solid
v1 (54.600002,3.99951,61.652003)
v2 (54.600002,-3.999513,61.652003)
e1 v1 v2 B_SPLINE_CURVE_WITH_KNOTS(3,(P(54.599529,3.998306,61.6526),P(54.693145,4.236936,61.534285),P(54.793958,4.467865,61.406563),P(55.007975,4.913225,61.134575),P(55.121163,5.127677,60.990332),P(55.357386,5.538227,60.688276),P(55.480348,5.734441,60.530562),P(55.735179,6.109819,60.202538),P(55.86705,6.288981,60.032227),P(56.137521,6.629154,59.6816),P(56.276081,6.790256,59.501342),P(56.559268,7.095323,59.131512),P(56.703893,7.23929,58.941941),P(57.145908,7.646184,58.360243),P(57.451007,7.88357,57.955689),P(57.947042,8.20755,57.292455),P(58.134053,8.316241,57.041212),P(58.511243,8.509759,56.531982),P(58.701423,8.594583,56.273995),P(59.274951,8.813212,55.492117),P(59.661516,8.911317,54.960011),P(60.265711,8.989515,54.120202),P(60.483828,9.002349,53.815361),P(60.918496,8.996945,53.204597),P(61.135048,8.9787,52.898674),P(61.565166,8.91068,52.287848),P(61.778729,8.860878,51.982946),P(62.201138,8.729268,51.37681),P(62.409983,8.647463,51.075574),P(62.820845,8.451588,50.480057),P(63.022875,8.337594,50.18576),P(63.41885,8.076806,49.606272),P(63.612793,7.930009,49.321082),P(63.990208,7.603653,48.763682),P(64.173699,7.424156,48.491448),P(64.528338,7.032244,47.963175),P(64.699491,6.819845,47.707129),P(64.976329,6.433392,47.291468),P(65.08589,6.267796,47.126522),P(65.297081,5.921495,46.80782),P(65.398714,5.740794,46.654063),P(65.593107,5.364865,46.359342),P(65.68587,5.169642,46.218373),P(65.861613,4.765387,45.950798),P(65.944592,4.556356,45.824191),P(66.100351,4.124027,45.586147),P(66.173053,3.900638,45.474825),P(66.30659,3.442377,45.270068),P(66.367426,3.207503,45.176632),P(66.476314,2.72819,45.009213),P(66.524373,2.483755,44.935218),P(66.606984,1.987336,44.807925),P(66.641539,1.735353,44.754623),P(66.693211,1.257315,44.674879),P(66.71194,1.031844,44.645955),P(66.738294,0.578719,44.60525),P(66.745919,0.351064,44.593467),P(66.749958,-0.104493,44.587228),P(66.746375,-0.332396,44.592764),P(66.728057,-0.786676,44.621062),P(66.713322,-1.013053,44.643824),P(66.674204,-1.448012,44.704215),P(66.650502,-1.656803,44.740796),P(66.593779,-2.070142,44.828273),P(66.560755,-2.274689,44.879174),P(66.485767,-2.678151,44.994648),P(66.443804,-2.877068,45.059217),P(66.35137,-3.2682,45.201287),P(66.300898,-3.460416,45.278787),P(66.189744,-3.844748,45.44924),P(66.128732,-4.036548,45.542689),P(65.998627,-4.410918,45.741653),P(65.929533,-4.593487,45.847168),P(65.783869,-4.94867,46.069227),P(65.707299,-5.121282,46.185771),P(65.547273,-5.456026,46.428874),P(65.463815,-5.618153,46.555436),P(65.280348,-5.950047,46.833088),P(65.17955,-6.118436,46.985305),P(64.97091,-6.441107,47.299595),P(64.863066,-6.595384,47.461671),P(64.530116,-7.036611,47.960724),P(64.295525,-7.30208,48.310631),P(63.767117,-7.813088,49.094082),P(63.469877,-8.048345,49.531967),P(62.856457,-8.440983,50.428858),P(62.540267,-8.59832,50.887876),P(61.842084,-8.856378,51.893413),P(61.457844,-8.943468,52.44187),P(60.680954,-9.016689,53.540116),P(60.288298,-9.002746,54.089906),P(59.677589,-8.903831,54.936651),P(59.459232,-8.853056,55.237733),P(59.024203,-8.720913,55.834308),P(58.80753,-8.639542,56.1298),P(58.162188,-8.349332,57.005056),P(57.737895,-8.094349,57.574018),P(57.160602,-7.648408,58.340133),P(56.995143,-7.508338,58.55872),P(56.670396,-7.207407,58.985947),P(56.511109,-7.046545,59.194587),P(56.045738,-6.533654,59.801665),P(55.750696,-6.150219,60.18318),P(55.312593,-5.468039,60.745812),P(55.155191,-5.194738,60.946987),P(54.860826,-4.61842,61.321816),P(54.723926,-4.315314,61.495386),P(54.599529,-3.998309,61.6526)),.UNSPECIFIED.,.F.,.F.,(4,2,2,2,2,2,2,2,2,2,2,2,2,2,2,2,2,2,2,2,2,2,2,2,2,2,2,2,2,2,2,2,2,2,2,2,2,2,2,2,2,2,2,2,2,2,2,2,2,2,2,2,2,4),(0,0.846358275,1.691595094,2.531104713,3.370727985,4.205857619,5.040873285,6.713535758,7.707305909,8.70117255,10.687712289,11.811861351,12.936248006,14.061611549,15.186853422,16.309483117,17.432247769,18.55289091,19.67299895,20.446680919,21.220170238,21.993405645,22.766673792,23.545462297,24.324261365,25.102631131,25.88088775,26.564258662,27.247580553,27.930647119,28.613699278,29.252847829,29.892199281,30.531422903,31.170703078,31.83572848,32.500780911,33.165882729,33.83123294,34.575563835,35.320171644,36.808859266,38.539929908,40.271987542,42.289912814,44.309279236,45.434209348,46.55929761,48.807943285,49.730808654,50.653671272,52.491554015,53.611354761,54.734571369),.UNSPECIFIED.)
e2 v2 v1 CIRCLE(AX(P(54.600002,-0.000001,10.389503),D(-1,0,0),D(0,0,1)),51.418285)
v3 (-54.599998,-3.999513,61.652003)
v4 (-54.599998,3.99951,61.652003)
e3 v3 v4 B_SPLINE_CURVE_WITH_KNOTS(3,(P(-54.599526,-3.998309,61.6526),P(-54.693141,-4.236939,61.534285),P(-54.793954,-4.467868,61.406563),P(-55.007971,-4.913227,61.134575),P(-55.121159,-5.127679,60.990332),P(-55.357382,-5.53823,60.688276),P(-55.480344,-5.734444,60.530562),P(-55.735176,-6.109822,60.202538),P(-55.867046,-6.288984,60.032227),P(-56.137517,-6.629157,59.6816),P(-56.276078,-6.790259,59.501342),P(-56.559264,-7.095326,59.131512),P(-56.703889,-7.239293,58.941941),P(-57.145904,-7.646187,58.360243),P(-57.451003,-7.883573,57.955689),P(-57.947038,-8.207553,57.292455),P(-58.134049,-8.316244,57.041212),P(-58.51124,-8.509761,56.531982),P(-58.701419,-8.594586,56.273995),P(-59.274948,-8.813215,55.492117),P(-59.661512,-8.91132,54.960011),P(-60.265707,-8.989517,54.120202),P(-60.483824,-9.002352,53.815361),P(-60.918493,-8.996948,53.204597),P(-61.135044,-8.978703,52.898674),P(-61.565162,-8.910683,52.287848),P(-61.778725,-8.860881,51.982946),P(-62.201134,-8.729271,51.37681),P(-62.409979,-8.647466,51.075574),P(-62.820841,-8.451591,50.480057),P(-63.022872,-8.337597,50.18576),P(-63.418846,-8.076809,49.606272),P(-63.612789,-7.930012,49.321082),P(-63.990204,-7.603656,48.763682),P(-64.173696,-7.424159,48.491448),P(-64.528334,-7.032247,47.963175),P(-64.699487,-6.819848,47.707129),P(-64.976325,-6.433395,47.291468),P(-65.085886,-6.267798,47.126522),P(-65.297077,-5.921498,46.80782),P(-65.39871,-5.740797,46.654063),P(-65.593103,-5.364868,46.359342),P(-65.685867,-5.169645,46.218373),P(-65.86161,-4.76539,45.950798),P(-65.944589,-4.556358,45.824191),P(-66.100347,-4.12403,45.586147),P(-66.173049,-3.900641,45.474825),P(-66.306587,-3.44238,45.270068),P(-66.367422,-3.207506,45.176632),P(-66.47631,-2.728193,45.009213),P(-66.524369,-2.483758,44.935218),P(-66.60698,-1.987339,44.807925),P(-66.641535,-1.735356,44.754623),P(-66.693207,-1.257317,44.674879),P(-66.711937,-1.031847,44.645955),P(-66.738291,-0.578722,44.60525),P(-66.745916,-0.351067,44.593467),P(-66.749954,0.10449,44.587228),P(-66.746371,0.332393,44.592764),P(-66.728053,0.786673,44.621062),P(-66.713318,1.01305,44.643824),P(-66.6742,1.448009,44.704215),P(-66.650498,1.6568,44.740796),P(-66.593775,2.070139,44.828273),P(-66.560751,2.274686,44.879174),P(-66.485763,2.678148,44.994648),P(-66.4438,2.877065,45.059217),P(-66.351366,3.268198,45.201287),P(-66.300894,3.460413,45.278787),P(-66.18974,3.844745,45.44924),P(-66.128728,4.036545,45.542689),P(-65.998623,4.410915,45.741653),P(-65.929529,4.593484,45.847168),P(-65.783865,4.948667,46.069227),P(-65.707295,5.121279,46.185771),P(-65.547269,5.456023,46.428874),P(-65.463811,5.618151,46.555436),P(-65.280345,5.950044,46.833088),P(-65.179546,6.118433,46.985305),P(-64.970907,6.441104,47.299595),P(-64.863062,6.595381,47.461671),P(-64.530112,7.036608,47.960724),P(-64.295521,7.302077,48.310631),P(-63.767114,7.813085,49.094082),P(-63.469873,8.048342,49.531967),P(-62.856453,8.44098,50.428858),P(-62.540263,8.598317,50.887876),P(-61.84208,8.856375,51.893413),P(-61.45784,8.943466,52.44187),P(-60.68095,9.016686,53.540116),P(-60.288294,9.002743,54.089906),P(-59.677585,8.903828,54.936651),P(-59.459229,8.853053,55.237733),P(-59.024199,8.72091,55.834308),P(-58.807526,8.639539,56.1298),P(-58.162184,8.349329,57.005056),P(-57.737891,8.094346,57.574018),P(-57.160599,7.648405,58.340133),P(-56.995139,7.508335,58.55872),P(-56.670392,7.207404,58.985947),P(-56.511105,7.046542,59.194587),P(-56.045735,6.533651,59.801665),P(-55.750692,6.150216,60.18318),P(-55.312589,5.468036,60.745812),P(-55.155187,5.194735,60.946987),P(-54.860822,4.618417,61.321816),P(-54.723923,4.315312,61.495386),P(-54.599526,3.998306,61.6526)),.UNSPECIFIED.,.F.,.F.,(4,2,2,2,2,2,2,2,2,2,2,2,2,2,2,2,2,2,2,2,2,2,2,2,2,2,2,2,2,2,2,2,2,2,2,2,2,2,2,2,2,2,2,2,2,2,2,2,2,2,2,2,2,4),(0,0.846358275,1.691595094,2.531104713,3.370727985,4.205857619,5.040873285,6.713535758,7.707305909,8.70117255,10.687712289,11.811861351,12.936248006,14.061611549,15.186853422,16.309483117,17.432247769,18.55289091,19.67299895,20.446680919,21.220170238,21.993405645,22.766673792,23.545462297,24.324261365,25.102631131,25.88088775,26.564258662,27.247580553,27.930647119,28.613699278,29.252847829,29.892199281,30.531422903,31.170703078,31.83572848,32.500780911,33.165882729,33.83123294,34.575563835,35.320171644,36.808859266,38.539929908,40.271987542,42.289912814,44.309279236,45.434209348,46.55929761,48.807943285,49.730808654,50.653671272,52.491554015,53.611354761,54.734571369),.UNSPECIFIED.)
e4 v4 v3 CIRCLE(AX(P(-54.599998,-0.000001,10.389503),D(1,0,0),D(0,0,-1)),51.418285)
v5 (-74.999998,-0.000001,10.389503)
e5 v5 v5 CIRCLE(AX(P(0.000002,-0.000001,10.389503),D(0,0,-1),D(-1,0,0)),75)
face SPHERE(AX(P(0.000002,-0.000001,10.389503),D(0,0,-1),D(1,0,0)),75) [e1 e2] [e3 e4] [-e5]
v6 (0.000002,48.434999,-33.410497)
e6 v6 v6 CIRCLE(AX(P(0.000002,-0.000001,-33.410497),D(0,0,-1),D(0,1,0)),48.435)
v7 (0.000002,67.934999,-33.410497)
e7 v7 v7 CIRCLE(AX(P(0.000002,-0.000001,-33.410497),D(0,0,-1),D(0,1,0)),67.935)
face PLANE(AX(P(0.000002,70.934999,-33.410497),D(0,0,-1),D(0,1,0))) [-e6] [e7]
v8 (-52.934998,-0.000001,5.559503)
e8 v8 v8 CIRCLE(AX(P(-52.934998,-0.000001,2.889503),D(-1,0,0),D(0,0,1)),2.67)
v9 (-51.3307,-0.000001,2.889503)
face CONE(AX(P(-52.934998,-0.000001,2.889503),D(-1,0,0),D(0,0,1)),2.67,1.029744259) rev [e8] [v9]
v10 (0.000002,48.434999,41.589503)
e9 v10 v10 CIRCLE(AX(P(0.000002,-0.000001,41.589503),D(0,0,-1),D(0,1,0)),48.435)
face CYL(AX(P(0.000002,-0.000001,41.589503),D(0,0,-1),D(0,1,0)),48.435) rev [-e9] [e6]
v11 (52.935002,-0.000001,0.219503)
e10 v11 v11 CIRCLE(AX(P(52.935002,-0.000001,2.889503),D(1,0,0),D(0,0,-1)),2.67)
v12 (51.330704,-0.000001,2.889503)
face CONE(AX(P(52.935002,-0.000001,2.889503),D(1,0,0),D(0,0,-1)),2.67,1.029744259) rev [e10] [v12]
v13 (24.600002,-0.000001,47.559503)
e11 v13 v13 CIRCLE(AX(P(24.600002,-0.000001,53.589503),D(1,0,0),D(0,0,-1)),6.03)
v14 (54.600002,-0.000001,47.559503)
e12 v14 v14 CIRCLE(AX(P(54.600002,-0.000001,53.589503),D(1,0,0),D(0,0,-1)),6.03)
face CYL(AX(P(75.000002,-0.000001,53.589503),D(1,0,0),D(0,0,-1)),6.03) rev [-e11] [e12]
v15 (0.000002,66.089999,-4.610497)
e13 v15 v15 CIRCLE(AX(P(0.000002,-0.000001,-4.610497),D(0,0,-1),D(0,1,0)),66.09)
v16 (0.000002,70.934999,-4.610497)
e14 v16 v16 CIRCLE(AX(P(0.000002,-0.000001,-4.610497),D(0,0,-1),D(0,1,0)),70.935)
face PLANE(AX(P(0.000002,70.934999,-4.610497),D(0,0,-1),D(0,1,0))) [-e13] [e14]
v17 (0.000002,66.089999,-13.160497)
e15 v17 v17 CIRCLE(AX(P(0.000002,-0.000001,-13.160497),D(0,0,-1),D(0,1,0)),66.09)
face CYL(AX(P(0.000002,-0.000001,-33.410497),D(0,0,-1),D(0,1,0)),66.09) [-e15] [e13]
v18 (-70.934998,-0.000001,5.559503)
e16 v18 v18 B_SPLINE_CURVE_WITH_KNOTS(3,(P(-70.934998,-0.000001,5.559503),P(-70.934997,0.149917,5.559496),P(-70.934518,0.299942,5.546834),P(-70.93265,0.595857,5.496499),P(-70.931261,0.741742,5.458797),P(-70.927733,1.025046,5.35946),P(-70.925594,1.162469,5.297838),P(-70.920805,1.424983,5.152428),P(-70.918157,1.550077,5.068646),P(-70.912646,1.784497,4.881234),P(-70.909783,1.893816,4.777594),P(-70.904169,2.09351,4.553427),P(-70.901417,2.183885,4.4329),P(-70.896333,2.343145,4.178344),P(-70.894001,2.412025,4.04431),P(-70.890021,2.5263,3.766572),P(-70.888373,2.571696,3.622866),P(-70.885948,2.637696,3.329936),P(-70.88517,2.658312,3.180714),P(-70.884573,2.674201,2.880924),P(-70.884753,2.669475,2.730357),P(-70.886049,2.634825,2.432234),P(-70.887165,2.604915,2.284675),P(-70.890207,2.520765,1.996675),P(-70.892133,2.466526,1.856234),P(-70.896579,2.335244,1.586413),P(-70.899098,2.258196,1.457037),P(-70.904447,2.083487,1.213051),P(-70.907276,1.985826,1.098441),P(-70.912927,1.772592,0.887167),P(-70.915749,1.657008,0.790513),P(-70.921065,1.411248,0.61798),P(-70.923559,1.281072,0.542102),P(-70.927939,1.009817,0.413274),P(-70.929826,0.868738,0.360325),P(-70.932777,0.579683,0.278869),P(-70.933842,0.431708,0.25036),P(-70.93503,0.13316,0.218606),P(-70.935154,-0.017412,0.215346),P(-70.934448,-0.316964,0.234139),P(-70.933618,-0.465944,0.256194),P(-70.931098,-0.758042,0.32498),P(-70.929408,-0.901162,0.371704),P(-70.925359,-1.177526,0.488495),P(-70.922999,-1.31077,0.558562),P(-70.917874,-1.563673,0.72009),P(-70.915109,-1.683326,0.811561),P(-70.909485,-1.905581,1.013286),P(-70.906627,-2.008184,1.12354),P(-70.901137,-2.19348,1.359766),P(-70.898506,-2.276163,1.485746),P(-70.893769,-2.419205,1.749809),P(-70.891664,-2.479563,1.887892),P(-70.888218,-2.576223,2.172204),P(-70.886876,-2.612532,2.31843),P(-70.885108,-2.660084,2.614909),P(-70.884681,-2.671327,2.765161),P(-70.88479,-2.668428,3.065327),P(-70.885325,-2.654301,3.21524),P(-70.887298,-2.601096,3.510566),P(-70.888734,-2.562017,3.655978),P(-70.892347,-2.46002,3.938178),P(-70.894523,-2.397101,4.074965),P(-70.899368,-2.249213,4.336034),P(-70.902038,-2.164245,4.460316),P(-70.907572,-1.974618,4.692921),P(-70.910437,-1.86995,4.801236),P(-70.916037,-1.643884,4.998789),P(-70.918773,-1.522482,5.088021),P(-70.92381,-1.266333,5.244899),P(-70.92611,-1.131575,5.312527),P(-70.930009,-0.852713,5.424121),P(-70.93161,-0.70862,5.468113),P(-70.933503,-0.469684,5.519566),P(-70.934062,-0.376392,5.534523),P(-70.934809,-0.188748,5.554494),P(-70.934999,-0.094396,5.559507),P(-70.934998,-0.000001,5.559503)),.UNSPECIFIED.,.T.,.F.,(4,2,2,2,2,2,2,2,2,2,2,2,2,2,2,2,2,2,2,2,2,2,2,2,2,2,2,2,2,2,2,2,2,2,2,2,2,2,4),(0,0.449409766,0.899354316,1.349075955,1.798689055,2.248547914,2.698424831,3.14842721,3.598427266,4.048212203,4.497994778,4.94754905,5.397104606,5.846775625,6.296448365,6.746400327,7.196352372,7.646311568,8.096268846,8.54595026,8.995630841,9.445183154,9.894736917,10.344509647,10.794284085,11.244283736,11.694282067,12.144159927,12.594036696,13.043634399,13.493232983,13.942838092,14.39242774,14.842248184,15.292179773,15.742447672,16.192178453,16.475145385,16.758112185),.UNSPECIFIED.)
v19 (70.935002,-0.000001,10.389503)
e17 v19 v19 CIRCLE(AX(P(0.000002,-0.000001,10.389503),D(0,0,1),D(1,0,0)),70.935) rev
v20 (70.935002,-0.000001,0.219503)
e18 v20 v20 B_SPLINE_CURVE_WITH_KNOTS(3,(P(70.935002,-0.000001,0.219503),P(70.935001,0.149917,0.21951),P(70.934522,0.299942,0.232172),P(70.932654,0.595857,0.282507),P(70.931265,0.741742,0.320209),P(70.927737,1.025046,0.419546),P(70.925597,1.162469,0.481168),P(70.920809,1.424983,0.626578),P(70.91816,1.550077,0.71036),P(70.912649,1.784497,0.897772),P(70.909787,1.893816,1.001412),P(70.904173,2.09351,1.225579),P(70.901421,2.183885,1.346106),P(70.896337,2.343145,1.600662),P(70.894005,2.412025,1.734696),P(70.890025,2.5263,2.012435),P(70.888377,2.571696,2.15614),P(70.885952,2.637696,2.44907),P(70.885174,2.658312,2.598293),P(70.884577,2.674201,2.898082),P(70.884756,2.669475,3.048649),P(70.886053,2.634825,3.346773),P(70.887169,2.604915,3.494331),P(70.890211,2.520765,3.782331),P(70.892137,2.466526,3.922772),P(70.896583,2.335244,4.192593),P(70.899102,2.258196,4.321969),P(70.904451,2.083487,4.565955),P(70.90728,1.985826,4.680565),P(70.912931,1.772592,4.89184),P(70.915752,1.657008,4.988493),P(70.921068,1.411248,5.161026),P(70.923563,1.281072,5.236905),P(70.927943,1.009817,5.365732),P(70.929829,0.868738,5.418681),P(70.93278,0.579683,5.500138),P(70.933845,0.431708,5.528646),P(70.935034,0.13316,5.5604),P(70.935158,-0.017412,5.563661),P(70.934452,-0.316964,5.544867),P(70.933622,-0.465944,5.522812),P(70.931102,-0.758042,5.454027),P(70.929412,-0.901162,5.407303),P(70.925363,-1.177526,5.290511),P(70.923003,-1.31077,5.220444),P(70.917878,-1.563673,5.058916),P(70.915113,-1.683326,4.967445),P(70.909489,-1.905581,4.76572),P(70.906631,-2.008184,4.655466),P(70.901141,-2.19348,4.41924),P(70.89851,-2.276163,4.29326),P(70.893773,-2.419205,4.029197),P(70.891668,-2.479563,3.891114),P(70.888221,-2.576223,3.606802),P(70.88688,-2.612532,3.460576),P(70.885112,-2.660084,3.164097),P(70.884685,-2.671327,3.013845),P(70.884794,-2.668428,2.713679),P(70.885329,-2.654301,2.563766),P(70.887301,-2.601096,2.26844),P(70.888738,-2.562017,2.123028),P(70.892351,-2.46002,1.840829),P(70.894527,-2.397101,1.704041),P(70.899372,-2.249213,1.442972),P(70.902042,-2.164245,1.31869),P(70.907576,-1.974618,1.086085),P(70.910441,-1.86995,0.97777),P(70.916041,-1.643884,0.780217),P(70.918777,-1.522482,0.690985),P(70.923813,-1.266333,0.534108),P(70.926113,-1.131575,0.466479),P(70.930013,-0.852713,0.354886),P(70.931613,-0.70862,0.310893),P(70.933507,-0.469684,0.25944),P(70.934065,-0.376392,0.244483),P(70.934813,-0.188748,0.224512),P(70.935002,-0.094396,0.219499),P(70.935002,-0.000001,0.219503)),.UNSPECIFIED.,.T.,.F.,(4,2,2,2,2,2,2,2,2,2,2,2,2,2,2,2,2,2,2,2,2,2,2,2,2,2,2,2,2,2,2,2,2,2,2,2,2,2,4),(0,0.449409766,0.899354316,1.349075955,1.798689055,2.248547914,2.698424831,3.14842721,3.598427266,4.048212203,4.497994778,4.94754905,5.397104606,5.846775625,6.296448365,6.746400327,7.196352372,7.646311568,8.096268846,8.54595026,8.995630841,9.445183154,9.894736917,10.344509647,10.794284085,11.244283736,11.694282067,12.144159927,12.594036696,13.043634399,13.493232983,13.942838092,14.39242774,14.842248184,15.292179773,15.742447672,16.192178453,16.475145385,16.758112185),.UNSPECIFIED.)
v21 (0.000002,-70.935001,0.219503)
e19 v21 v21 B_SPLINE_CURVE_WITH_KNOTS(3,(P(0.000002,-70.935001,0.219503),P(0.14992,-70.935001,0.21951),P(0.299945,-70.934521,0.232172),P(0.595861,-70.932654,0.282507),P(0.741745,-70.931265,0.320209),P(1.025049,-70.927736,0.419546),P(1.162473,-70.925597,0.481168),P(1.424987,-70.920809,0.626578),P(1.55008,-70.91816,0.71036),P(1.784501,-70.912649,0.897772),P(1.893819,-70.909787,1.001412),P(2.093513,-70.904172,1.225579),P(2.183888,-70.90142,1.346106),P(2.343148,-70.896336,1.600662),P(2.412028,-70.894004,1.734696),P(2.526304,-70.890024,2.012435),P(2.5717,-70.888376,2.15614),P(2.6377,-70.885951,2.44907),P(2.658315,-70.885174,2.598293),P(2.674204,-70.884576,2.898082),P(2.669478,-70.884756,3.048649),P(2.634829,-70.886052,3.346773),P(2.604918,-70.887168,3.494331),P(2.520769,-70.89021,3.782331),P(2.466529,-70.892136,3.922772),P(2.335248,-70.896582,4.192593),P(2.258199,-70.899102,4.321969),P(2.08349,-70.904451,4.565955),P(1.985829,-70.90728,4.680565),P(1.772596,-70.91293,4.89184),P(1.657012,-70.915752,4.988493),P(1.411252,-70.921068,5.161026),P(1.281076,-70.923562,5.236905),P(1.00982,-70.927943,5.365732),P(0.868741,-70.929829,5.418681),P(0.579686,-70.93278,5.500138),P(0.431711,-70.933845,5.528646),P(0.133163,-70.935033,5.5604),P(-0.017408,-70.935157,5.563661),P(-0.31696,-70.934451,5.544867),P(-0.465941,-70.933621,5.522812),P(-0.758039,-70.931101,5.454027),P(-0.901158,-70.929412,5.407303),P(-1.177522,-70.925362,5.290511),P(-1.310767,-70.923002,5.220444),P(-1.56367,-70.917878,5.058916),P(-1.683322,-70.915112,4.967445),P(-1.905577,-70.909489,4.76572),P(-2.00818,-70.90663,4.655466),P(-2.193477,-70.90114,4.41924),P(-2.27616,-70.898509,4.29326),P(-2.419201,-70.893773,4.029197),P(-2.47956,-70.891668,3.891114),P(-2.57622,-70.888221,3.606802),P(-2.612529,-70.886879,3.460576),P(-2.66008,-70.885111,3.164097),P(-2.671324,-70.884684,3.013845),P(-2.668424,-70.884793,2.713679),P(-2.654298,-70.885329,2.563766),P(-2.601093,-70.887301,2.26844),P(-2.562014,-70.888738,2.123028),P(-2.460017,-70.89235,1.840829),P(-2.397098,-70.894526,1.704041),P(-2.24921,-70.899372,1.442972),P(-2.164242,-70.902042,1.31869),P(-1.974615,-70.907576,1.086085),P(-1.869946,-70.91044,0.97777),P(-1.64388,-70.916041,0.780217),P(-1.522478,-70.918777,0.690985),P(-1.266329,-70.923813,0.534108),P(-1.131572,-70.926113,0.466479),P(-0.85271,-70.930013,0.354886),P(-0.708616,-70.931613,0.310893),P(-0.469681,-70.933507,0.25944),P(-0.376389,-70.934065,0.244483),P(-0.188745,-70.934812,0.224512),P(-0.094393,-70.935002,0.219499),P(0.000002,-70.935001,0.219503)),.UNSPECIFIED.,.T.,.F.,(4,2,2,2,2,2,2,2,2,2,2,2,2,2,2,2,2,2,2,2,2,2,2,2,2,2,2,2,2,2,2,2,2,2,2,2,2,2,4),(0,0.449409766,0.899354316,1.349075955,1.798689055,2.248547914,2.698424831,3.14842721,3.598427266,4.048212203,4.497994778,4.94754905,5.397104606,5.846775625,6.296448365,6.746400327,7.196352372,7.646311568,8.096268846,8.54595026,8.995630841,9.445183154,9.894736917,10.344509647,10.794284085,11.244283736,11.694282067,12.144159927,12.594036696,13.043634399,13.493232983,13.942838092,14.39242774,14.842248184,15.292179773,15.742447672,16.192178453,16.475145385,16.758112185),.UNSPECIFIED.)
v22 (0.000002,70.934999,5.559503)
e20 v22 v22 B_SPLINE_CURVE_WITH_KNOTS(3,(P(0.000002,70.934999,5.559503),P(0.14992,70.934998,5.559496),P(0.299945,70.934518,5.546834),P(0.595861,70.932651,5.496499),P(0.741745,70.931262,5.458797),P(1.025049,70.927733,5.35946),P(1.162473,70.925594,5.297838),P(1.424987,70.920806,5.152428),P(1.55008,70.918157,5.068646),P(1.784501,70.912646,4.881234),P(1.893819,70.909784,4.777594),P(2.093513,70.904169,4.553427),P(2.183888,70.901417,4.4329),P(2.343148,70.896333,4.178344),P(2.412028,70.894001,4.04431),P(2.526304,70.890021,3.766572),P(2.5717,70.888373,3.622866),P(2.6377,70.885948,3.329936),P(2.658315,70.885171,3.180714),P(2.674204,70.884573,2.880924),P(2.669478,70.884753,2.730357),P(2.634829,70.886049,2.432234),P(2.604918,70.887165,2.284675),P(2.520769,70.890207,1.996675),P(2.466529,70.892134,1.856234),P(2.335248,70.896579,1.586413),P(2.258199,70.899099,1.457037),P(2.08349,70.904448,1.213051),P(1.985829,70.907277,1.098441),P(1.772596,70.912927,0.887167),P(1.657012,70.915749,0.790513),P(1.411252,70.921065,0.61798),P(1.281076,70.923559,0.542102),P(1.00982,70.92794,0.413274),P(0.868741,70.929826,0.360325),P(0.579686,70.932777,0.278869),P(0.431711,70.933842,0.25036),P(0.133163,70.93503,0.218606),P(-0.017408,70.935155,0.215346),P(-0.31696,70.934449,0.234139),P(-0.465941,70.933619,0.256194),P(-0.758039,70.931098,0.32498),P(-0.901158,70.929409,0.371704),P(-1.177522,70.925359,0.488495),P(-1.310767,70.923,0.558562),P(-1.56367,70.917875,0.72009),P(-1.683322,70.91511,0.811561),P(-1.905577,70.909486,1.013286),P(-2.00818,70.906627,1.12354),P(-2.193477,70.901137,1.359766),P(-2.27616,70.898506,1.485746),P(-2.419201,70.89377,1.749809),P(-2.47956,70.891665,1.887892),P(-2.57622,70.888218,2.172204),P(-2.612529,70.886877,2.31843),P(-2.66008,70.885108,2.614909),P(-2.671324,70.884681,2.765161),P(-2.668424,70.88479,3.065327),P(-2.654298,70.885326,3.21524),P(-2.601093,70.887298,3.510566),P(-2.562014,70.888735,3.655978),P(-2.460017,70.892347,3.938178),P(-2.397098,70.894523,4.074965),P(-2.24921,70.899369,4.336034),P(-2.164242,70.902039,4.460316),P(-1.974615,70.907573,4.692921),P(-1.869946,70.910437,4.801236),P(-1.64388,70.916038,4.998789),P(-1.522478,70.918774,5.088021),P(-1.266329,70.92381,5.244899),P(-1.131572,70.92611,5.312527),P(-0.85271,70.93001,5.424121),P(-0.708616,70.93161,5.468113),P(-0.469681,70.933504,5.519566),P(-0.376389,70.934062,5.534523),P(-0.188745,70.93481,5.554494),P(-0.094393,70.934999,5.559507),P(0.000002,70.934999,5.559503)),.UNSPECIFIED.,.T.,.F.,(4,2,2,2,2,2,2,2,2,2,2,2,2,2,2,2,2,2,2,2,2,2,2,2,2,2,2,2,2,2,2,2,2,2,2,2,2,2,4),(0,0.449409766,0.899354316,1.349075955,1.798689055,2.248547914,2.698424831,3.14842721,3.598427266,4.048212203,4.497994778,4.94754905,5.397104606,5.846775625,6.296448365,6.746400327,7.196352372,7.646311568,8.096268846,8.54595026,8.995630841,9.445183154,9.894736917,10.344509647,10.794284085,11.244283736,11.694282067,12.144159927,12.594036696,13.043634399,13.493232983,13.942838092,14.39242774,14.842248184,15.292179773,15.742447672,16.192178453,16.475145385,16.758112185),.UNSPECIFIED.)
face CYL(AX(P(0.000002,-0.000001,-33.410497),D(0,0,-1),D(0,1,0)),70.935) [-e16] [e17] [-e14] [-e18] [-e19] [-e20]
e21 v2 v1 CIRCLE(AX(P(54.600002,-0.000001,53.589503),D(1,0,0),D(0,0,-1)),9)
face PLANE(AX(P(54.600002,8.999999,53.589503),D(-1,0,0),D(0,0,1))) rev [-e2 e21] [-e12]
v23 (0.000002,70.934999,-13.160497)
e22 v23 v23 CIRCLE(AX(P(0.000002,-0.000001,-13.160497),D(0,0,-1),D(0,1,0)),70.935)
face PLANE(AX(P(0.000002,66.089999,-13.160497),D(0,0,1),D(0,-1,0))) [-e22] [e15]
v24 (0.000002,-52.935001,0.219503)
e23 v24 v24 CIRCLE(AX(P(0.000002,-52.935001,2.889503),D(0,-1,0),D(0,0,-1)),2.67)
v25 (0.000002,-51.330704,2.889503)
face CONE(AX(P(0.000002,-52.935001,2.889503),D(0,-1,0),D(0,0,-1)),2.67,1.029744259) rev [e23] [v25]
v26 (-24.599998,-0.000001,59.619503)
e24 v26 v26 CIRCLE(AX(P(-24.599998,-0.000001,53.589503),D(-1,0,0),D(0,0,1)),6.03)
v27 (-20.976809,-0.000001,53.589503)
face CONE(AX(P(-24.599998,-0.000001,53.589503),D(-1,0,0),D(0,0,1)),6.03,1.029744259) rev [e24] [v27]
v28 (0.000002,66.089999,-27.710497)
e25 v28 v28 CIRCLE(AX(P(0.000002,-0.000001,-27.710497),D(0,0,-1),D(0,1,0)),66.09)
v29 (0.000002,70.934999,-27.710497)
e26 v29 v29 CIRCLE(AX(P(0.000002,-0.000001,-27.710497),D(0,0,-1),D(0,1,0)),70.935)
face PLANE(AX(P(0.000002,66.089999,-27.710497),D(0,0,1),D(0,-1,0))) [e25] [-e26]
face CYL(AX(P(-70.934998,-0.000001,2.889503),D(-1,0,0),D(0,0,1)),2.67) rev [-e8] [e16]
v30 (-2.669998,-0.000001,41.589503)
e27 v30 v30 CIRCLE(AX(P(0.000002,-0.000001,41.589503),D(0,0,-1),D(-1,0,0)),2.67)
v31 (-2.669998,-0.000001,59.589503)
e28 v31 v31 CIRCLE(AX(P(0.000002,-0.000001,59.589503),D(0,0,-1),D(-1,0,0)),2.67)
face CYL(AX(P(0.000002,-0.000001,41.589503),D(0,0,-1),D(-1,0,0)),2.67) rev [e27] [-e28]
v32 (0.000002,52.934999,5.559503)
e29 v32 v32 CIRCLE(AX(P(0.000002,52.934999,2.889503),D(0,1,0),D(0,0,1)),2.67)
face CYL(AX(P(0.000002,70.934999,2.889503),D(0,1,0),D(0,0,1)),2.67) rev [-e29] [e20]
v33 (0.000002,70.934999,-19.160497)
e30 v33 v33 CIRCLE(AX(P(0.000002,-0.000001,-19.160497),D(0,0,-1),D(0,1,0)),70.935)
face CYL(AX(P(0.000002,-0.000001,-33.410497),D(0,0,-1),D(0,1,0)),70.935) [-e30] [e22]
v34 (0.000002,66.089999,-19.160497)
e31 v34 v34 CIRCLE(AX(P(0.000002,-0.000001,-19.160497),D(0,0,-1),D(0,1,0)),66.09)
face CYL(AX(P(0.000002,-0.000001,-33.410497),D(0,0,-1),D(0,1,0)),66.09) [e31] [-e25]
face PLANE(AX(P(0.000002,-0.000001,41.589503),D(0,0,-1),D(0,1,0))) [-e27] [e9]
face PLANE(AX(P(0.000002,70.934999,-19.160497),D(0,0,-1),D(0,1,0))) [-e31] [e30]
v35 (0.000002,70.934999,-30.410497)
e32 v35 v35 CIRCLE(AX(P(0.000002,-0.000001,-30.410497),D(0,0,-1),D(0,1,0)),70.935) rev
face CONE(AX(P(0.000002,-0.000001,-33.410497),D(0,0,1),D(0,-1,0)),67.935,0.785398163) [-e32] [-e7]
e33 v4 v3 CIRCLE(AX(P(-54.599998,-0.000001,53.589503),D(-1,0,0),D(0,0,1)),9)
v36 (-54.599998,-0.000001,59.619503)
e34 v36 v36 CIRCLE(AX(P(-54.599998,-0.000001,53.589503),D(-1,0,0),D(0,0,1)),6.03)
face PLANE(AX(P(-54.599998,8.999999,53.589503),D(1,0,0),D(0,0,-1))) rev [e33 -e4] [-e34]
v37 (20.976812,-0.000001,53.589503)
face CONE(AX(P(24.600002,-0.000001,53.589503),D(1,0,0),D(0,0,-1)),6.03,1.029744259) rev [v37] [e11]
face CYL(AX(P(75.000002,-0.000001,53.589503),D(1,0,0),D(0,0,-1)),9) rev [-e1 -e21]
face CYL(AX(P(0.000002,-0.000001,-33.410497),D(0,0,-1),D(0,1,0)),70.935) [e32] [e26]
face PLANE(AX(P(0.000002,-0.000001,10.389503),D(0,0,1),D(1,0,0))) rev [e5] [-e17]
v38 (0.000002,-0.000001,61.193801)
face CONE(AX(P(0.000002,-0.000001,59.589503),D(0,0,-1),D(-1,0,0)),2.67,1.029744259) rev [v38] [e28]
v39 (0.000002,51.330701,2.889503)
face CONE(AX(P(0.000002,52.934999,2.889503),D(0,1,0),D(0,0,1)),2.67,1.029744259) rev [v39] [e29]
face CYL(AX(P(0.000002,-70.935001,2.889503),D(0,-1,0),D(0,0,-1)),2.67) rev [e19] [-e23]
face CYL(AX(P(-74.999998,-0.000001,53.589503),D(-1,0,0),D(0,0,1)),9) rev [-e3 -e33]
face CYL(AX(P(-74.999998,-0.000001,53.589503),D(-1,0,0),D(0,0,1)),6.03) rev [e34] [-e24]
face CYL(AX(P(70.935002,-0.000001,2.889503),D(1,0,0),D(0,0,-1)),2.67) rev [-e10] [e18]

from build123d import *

# Parameters (mm, degrees)
F_4_40_TAPPED_HOLE1_D               = 2.2606
F_4_40_TAPPED_HOLE1_DEPTH           = 7.62
F_4_40_TAPPED_HOLE1_TIP             = 0.679152758
F_4_40_TAPPED_HOLE1_ON_FACE_2_D     = 2.2606
F_4_40_TAPPED_HOLE1_ON_FACE_2_DEPTH = 7.62
F_4_40_TAPPED_HOLE1_ON_FACE_2_TIP   = 0.679152758
F_4_40_TAPPED_HOLE1_ON_FACE_3_D     = 2.2606
F_4_40_TAPPED_HOLE1_ON_FACE_3_DEPTH = 7.62
F_4_40_TAPPED_HOLE1_ON_FACE_3_TIP   = 0.679152758
F_4_40_TAPPED_HOLE1_ON_FACE_4_D     = 2.2606
F_4_40_TAPPED_HOLE1_ON_FACE_4_DEPTH = 7.62
F_4_40_TAPPED_HOLE1_ON_FACE_4_TIP   = 0.679152758
SKETCH10_R                          = 20.50415
CUT_EXTRUDE3_DEPTH                  = 31.75
F_4_40_TAPPED_HOLE2_D               = 2.2606
F_4_40_TAPPED_HOLE2_DEPTH           = 7.62
F_4_40_TAPPED_HOLE2_TIP             = 0.679152758
CHAMFER1_SIZE                       = 1.27
SCALE1_SCALE                        = 2.362204724


# Read off the part's stored shape, not the designer's step: AdvancedHole3
with BuildPart() as part:
    # Sketch2 → Revolve1 (revolve)
    with BuildSketch(Plane(origin=(0, 0, 0), x_dir=(0, 0, -1), z_dir=(1, 0, 0))):
        Polygon((-18.542, 30.02915), (-12.192, 30.02915), (-12.192, 27.9781), (-8.5725, 27.9781), (-8.5725, 30.02915), (-6.0325, 30.02915), (-6.0325, 27.9781), (-2.413, 27.9781), (-2.413, 30.02915), (0, 30.02915), (0, 0), (-18.542, 0), align=None)
    revolve(axis=Axis((0, 0, 0), (0, 0, 1)))

    # #4-40 Tapped Hole1
    with Locations(Plane(origin=(0, -30.02915, 15.367), x_dir=(0, 0, -1), z_dir=(0, -1, 0))):
        with Locations((0, 0)):
            Hole(F_4_40_TAPPED_HOLE1_D / 2, depth=F_4_40_TAPPED_HOLE1_DEPTH)
            with Locations((0, 0, -(F_4_40_TAPPED_HOLE1_DEPTH + F_4_40_TAPPED_HOLE1_TIP / 2))):  # 118° drill point
                Cone(0, F_4_40_TAPPED_HOLE1_D / 2, F_4_40_TAPPED_HOLE1_TIP, mode=Mode.SUBTRACT)

    # #4-40 Tapped Hole1 on face 2
    with Locations(Plane(origin=(30.02915, 0, 15.367), x_dir=(0, 0, 1), z_dir=(1, 0, 0))):
        with Locations((0, 0)):
            Hole(F_4_40_TAPPED_HOLE1_ON_FACE_2_D / 2, depth=F_4_40_TAPPED_HOLE1_ON_FACE_2_DEPTH)
            with Locations((0, 0, -(F_4_40_TAPPED_HOLE1_ON_FACE_2_DEPTH + F_4_40_TAPPED_HOLE1_ON_FACE_2_TIP / 2))):  # 118° drill point
                Cone(0, F_4_40_TAPPED_HOLE1_ON_FACE_2_D / 2, F_4_40_TAPPED_HOLE1_ON_FACE_2_TIP, mode=Mode.SUBTRACT)

    # #4-40 Tapped Hole1 on face 3
    with Locations(Plane(origin=(-30.02915, 0, 15.367), x_dir=(0, 0, -1), z_dir=(-1, 0, 0))):
        with Locations((0, 0)):
            Hole(F_4_40_TAPPED_HOLE1_ON_FACE_3_D / 2, depth=F_4_40_TAPPED_HOLE1_ON_FACE_3_DEPTH)
            with Locations((0, 0, -(F_4_40_TAPPED_HOLE1_ON_FACE_3_DEPTH + F_4_40_TAPPED_HOLE1_ON_FACE_3_TIP / 2))):  # 118° drill point
                Cone(0, F_4_40_TAPPED_HOLE1_ON_FACE_3_D / 2, F_4_40_TAPPED_HOLE1_ON_FACE_3_TIP, mode=Mode.SUBTRACT)

    # #4-40 Tapped Hole1 on face 4
    with Locations(Plane(origin=(0, 30.02915, 15.367), x_dir=(0, 0, 1), z_dir=(0, 1, 0))):
        with Locations((0, 0)):
            Hole(F_4_40_TAPPED_HOLE1_ON_FACE_4_D / 2, depth=F_4_40_TAPPED_HOLE1_ON_FACE_4_DEPTH)
            with Locations((0, 0, -(F_4_40_TAPPED_HOLE1_ON_FACE_4_DEPTH + F_4_40_TAPPED_HOLE1_ON_FACE_4_TIP / 2))):  # 118° drill point
                Cone(0, F_4_40_TAPPED_HOLE1_ON_FACE_4_D / 2, F_4_40_TAPPED_HOLE1_ON_FACE_4_TIP, mode=Mode.SUBTRACT)

    # Sketch6 → Revolve2 (revolve)
    with BuildSketch(Plane(origin=(0, 0, 0), x_dir=(1, 0, 0), z_dir=(0, 1, 0)), mode=Mode.PRIVATE) as revolve2_sk:
        with BuildLine():
            Line((0, -18.542), (31.75, -18.542))
            ThreePointArc((31.75, -18.542), (22.450640303, -40.992640303), (0, -50.292))
            Line((0, -50.292), (0, -18.542))
        make_face()
    revolve(revolve2_sk.sketch.rotate(Axis((0, 0, 18.542), (0, 0, 1)), 90), axis=Axis((0, 0, 18.542), (0, 0, 1)))

    # Sketch10 → Cut-Extrude3 (cut)
    with BuildSketch(Plane(origin=(0, 0, 0), x_dir=(-1, 0, 0), z_dir=(0, 0, -1))):
        with Locations(Location((0, 0, 0), (0, 0, 90))):
            Circle(SKETCH10_R)
    extrude(amount=-CUT_EXTRUDE3_DEPTH, mode=Mode.SUBTRACT)

    # #4-40 Tapped Hole2
    with Locations(Plane(origin=(0, 0, 31.75), x_dir=(-1, 0, 0), z_dir=(0, 0, -1))):
        with Locations((0, 0)):
            Hole(F_4_40_TAPPED_HOLE2_D / 2, depth=F_4_40_TAPPED_HOLE2_DEPTH)
            with Locations((0, 0, -(F_4_40_TAPPED_HOLE2_DEPTH + F_4_40_TAPPED_HOLE2_TIP / 2))):  # 118° drill point
                Cone(0, F_4_40_TAPPED_HOLE2_D / 2, F_4_40_TAPPED_HOLE2_TIP, mode=Mode.SUBTRACT)

    # Chamfer1
    chamfer1_edges = [part.edges().sort_by_distance(p)[0] for p in [
        (0, -30.02915, 0),
    ]]
    chamfer(chamfer1_edges, length=CHAMFER1_SIZE)

    # AdvancedHole3 outline → AdvancedHole3 (revolve, cut)
    with BuildSketch(Plane.YX.offset(-36.83)):
        Polygon((3.81, 28.256858344), (0, 28.256858344), (0, 8.880183098), (2.5527, 10.414), (2.5527, 23.114), (3.81, 23.114), align=None)
    advancedhole3 = revolve(axis=Axis((0, 0, 36.83), (1, 0, 0)), mode=Mode.SUBTRACT)

    # Mirror2: AdvancedHole3 across plane
    add(advancedhole3.mirror(Plane(origin=(0, 0, 0), x_dir=(0, 0, 1), z_dir=(1, 0, 0))), mode=Mode.SUBTRACT)


with BuildPart() as part_1:
    # Scale1: scaled about (-5.1967e-05, 4.9002e-05, 24.526771352)
    add(part.part.scale(SCALE1_SCALE).moved(Location((7.079e-05, -6.6751e-05, -33.41048381))))


solid = part_1.part
